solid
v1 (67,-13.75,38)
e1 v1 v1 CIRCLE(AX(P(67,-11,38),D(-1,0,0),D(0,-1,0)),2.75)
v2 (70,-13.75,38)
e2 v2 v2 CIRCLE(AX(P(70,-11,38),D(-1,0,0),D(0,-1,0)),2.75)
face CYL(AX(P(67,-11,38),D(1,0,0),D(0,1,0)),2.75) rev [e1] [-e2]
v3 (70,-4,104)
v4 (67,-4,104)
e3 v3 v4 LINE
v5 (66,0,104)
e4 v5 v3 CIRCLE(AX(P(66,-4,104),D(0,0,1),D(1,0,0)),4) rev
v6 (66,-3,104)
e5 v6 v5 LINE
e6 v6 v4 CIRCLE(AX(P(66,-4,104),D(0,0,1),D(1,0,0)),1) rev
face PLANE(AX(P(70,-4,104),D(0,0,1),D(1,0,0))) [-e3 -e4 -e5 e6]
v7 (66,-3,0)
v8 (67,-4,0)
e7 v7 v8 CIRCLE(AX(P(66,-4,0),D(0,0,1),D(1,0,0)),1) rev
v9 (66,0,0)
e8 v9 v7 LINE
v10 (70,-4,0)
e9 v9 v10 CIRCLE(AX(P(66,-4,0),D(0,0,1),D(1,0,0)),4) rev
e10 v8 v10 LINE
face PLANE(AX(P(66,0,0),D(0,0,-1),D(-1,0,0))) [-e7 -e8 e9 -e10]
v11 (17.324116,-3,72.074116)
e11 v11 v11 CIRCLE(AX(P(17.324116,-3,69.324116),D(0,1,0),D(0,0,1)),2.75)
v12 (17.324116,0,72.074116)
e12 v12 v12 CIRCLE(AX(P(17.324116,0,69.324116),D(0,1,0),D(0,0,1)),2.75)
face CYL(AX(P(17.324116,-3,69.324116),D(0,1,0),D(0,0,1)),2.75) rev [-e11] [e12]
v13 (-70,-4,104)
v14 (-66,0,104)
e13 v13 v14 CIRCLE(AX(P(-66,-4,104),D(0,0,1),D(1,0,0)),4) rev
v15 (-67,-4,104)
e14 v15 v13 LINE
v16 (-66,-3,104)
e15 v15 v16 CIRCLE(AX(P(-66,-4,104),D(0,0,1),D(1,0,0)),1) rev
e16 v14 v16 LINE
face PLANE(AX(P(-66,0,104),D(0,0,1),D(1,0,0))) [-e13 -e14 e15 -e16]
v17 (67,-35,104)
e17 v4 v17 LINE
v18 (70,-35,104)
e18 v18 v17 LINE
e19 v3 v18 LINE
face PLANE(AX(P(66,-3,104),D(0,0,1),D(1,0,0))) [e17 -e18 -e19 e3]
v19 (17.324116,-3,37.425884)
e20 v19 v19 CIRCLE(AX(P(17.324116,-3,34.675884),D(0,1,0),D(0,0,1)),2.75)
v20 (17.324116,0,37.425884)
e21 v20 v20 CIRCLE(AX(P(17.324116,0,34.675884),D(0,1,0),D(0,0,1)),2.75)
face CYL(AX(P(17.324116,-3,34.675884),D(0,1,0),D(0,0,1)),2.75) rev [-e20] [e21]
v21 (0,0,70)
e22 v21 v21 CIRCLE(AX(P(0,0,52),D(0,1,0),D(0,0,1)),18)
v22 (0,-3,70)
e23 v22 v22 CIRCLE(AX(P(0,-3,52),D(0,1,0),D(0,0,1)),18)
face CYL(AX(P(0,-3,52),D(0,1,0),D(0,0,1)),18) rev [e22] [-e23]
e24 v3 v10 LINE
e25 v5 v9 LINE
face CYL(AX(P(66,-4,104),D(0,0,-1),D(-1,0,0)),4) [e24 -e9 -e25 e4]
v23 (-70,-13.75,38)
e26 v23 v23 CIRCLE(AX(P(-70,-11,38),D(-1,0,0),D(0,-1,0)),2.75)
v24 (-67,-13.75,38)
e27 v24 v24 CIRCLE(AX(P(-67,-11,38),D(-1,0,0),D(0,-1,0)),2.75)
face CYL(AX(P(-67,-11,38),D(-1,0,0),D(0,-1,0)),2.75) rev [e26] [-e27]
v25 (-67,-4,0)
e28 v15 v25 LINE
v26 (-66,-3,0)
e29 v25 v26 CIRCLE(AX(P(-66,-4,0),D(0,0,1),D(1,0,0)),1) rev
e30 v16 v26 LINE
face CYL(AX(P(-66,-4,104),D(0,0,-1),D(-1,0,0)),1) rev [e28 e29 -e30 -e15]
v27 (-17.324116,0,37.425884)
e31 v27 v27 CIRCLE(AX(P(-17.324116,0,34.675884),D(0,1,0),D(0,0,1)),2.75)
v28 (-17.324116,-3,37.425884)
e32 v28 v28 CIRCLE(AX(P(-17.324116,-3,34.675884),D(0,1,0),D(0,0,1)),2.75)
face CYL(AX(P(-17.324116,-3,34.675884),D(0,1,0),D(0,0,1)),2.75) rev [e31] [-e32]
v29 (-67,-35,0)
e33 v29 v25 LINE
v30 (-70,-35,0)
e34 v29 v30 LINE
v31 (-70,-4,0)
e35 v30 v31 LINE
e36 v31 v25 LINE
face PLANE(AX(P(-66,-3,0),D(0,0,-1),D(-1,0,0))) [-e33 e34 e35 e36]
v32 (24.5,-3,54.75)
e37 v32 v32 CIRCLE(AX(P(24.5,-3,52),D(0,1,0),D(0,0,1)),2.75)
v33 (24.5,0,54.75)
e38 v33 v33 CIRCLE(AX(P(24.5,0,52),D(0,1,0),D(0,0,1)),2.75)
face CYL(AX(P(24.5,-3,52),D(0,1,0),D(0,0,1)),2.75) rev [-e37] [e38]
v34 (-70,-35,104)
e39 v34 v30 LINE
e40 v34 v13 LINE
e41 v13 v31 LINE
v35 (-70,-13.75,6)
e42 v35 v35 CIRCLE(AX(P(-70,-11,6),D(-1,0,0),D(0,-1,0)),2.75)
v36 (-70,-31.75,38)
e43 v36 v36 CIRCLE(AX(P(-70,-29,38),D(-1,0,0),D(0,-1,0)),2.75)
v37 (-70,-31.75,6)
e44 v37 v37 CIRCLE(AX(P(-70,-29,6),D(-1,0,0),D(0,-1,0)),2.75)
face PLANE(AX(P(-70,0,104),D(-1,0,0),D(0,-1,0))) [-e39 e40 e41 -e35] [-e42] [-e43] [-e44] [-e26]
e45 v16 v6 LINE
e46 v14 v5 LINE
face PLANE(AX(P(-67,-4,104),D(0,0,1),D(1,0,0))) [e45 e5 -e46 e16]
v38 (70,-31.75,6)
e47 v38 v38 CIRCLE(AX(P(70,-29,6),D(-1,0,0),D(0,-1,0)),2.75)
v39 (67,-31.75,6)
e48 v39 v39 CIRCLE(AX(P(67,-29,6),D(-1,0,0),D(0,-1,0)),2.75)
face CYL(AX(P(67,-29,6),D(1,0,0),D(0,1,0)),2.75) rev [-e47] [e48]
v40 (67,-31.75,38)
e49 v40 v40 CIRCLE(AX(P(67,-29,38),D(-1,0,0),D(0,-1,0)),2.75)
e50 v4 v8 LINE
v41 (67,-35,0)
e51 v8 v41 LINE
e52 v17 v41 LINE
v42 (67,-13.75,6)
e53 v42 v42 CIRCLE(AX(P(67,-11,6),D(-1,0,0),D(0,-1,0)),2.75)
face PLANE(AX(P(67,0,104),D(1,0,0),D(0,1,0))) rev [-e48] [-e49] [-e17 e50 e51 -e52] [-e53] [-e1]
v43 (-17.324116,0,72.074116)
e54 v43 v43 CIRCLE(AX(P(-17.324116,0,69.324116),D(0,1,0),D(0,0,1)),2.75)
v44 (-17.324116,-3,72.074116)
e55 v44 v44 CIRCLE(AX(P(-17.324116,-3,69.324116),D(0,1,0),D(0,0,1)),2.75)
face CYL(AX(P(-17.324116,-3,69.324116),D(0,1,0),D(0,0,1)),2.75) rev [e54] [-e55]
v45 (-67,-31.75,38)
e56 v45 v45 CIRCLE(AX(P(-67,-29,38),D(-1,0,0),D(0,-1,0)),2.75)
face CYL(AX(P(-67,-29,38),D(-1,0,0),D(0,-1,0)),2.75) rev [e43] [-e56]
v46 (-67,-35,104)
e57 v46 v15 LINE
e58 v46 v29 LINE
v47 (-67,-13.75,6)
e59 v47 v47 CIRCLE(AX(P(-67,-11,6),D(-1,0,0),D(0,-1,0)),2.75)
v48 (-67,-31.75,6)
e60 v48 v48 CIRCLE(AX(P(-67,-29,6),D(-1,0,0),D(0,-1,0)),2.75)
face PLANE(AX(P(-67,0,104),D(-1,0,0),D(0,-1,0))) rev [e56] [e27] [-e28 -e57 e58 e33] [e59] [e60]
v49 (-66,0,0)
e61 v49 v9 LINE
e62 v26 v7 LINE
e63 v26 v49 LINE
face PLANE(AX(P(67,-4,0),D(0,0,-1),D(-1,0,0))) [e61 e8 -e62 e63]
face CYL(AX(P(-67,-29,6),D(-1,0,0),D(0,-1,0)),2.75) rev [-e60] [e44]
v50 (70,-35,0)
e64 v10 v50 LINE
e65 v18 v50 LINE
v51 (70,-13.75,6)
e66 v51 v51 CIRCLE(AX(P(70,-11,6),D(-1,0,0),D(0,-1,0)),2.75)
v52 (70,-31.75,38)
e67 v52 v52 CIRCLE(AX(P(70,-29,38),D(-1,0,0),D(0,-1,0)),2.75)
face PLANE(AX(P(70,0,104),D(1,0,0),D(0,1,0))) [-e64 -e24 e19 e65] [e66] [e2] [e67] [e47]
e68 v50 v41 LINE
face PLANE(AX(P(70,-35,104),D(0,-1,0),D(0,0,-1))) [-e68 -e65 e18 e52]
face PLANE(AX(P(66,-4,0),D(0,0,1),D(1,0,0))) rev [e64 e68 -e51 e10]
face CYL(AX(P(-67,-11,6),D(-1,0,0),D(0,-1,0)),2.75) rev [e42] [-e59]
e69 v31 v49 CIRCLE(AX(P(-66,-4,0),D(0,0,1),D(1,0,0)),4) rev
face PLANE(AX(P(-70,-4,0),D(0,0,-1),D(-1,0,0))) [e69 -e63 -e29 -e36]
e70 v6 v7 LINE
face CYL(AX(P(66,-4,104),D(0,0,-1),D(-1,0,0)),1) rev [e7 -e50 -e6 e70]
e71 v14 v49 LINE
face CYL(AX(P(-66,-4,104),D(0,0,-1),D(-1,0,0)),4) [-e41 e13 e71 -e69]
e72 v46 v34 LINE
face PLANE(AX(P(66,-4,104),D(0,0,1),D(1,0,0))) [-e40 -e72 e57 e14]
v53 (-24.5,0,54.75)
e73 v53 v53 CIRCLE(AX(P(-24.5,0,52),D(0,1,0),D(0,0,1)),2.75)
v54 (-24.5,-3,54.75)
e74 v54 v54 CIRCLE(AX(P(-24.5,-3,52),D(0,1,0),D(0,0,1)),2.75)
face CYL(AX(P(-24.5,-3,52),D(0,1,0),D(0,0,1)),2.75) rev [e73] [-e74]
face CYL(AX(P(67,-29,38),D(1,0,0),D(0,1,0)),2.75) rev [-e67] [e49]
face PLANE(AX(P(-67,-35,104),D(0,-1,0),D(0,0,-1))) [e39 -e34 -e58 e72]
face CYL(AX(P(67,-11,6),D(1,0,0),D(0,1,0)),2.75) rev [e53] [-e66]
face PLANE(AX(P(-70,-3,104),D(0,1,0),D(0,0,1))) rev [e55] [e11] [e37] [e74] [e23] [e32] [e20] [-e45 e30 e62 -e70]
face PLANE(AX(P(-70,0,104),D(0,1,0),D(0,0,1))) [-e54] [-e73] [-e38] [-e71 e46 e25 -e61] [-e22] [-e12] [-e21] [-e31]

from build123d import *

# Parameters (mm, degrees)
SM_BASE_FLANGE_1_DEPTH = 104
SKETCH_6_R             = 2.75
CUT_EXTRUDE_1_DEPTH    = 3
SKETCH_7_R             = 2.75
CUT_EXTRUDE_3_DEPTH    = 3
SKETCH_8_R             = 18
CUT_EXTRUDE_4_DEPTH    = 3


# Sheet-metal steps are written as plain solids
with BuildPart() as part:
    # Sketch 1 → 基体-法兰1 (new body)
    with BuildSketch(Plane.XY):
        with BuildLine():
            Line((-70, -35), (-70, -4))
            ThreePointArc((-70, -4), (-68.828427125, -1.171572875), (-66, 0))
            Line((-66, 0), (66, 0))
            ThreePointArc((66, 0), (68.828427125, -1.171572875), (70, -4))
            Line((70, -4), (70, -35))
            Line((70, -35), (67, -35))
            Line((67, -35), (67, -4))
            ThreePointArc((67, -4), (66.707106781, -3.292893219), (66, -3))
            Line((66, -3), (-66, -3))
            ThreePointArc((-66, -3), (-66.707106781, -3.292893219), (-67, -4))
            Line((-67, -4), (-67, -35))
            Line((-67, -35), (-70, -35))
        make_face()
    extrude(amount=SM_BASE_FLANGE_1_DEPTH)

    # 草图6 → 切除-拉伸1 (cut)
    with BuildSketch(Plane(origin=(0, 0, 0), x_dir=(1, 0, 0), z_dir=(0, 1, 0))):
        with Locations(Location((24.5, -52, 0), (0, 0, 270))):
            Circle(SKETCH_6_R)
        with Locations(Location((17.324116139, -69.324116139, 0), (0, 0, 270))):
            Circle(SKETCH_6_R)
        with Locations(Location((-17.324116139, -69.324116139, 0), (0, 0, 270))):
            Circle(SKETCH_6_R)
        with Locations(Location((-24.5, -52, 0), (0, 0, 270))):
            Circle(SKETCH_6_R)
        with Locations(Location((-17.324116139, -34.675883861, 0), (0, 0, 270))):
            Circle(SKETCH_6_R)
        with Locations(Location((17.324116139, -34.675883861, 0), (0, 0, 270))):
            Circle(SKETCH_6_R)
    extrude(amount=-CUT_EXTRUDE_1_DEPTH, mode=Mode.SUBTRACT)

    # 草图7 → 切除-拉伸3 (cut)
    with BuildSketch(Plane.ZY.offset(70)):
        with Locations(Location((38, -29, 0), (0, 0, 270))):
            Circle(SKETCH_7_R)
        with Locations(Location((38, -11, 0), (0, 0, 270))):
            Circle(SKETCH_7_R)
        with Locations(Location((6, -11, 0), (0, 0, 270))):
            Circle(SKETCH_7_R)
        with Locations(Location((6, -29, 0), (0, 0, 270))):
            Circle(SKETCH_7_R)
    cut_extrude_3 = extrude(amount=-CUT_EXTRUDE_3_DEPTH, mode=Mode.SUBTRACT)

    # 镜向2: 切除-拉伸3 across plane
    add(cut_extrude_3.mirror(Plane(origin=(0, 0, 0), x_dir=(0, 0, 1), z_dir=(1, 0, 0))), mode=Mode.SUBTRACT)

    # 草图8 → 切除-拉伸4 (cut)
    with BuildSketch(Plane(origin=(0, 0, 0), x_dir=(1, 0, 0), z_dir=(0, 1, 0))):
        with Locations(Location((0, -52, 0), (0, 0, 270))):
            Circle(SKETCH_8_R)
    extrude(amount=-CUT_EXTRUDE_4_DEPTH, mode=Mode.SUBTRACT)


solid = part.part
